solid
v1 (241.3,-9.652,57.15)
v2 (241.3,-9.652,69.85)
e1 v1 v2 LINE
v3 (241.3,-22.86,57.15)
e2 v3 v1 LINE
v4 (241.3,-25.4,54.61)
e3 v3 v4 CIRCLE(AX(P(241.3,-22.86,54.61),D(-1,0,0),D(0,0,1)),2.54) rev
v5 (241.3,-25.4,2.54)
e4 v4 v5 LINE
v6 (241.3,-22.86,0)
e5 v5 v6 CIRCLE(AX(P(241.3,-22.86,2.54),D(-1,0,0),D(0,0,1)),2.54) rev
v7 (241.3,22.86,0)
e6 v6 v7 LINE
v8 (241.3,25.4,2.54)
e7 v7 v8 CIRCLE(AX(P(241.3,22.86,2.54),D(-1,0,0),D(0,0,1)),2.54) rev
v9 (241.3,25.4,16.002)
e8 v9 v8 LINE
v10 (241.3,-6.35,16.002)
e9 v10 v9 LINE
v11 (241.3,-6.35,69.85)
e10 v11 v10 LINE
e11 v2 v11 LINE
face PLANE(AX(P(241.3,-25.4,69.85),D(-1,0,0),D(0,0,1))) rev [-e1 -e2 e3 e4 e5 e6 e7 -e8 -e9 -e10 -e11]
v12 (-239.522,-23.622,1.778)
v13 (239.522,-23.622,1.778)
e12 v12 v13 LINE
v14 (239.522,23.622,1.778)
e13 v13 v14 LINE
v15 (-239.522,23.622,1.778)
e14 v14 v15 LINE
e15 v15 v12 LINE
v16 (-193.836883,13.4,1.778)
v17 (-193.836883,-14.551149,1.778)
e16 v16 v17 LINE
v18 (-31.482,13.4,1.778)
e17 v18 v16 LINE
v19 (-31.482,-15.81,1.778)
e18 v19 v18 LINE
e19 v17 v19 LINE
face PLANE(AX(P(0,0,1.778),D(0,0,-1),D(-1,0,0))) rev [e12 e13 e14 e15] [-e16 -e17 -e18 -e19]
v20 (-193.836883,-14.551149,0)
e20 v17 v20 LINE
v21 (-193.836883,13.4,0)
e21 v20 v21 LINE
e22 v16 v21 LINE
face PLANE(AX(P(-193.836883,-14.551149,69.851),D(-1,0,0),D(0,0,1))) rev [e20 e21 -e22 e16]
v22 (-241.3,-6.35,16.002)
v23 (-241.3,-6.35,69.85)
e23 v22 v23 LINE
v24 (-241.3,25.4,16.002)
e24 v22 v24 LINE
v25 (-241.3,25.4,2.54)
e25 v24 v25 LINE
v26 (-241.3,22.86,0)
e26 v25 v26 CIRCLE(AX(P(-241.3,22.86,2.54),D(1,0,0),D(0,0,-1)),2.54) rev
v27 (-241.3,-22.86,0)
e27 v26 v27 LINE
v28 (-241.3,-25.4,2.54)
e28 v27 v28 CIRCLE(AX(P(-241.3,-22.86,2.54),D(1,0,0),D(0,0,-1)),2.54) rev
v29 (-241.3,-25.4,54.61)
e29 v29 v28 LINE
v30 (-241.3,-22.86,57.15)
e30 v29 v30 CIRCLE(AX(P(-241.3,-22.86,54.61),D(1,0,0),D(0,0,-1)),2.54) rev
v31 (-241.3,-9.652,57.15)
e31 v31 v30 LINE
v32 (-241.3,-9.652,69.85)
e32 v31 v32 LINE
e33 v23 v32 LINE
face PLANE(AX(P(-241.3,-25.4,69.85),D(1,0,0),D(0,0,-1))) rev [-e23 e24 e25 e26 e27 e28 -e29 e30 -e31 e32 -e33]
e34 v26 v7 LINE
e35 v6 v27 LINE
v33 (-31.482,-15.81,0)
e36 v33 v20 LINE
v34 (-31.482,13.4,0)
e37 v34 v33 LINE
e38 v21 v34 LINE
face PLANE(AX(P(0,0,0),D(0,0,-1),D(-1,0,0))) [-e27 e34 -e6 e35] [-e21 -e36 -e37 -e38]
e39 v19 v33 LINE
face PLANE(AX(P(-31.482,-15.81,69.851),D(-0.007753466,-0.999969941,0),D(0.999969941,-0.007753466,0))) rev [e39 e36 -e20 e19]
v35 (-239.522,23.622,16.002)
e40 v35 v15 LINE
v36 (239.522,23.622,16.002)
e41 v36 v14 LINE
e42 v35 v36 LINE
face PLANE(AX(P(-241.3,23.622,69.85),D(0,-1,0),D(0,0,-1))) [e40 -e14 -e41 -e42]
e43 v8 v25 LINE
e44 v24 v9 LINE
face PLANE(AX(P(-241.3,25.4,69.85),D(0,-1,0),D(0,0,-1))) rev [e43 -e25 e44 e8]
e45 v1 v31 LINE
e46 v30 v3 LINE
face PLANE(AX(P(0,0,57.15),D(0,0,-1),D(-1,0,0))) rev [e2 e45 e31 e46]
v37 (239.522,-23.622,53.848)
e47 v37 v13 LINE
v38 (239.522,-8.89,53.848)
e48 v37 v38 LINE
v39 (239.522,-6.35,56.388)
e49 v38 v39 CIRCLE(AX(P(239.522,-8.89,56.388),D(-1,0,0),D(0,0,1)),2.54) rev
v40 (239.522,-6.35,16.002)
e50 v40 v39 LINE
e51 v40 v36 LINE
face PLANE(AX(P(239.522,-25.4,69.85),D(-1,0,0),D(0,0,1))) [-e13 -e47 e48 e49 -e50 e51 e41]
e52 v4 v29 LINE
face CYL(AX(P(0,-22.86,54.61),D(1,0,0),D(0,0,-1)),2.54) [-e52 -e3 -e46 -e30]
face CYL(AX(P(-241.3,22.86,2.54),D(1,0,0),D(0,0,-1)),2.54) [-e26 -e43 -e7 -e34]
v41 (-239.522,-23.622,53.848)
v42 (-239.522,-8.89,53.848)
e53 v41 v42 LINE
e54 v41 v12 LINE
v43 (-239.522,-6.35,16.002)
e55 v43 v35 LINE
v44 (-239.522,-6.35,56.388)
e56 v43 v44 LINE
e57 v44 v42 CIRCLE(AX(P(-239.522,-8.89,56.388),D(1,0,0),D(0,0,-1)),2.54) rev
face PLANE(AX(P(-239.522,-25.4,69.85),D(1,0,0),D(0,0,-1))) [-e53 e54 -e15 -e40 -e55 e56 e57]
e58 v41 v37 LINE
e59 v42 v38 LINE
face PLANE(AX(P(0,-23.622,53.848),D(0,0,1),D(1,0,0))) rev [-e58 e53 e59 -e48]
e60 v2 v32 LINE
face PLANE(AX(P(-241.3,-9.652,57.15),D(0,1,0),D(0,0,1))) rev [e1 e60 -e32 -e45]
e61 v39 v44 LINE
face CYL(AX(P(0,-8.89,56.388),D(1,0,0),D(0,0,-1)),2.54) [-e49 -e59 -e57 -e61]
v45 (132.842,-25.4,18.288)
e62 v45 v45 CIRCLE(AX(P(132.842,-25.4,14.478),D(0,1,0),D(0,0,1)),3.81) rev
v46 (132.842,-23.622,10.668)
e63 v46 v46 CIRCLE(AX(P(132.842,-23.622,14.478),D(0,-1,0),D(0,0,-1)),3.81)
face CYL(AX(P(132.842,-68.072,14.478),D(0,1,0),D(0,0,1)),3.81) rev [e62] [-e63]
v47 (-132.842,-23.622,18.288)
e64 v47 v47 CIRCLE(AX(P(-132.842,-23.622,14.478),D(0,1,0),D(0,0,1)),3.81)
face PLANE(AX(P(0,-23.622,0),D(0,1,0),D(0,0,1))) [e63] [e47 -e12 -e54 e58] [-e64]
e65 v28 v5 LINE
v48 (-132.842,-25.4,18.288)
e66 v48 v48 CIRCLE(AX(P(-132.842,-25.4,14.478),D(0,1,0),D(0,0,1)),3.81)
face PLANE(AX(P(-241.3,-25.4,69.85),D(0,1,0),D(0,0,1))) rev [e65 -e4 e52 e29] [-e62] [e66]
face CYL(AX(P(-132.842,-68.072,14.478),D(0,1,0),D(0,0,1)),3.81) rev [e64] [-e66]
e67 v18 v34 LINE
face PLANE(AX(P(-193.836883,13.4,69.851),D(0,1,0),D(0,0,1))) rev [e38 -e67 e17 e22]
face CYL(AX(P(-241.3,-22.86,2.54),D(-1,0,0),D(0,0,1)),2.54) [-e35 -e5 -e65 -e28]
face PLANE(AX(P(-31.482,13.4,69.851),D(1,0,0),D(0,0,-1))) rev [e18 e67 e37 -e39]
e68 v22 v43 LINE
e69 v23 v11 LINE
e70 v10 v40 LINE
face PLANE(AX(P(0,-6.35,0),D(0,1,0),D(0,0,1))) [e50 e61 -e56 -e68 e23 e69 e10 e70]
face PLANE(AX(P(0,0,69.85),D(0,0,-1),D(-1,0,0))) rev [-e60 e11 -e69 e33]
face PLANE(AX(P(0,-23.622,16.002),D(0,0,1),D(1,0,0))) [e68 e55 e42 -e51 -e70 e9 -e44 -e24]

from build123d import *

# Parameters (mm, degrees)
SKETCH1_W           = 482.6
SKETCH1_H           = 50.8
BOSS_EXTRUDE1_DEPTH = 69.85
CUT_EXTRUDE2_DEPTH  = 49.022
SKETCH3_W           = 482.6
SKETCH3_H           = 16.002
CUT_EXTRUDE3_DEPTH  = 31.75
SKETCH4_W           = 482.6
SKETCH4_H           = 15.748
CUT_EXTRUDE4_DEPTH  = 12.7
SHELL2_START        = -23.622
SHELL2_OUTLINE_W    = 479.044
SHELL2_OUTLINE_H    = 14.224
SHELL2_DEPTH        = 47.244
SKETCH5_W           = 1.778
SKETCH5_H           = 17.272
BOSS_EXTRUDE2_DEPTH = 44.45
FILLET1_R           = 2.54
SKETCH6_R           = 3.81
CUT_EXTRUDE5_DEPTH  = 44.45
CUT_EXTRUDE6_REACH  = 254.487


# Read off the part's stored shape, not the designer's step: Shell2
with BuildPart() as part:
    # Sketch1 → Boss-Extrude1 (new body)
    with BuildSketch(Plane.XY):
        Rectangle(SKETCH1_W, SKETCH1_H)
    extrude(amount=BOSS_EXTRUDE1_DEPTH)

    # Sketch2 → Cut-Extrude2 (cut)
    with BuildSketch(Plane(origin=(0, 25.4, 0), x_dir=(1, 0, 0), z_dir=(0, 1, 0))):
        Polygon((241.3, -16.002), (-241.3, -16.002), (-241.3, -34.925), (-241.3, -53.848), (241.3, -53.848), align=None)
    extrude(amount=-CUT_EXTRUDE2_DEPTH, mode=Mode.SUBTRACT)

    # Sketch3 → Cut-Extrude3 (cut)
    with BuildSketch(Plane(origin=(0, 25.4, 0), x_dir=(1, 0, 0), z_dir=(0, 1, 0))):
        with Locations((0, -61.849)):
            Rectangle(SKETCH3_W, SKETCH3_H)
    extrude(amount=-CUT_EXTRUDE3_DEPTH, mode=Mode.SUBTRACT)

    # Sketch4 → Cut-Extrude4 (cut)
    with BuildSketch(Plane.XY.offset(69.85)):
        with Locations((0, -17.526)):
            Rectangle(SKETCH4_W, SKETCH4_H)
    extrude(amount=-CUT_EXTRUDE4_DEPTH, mode=Mode.SUBTRACT)

    # Shell2 outline → Shell2 (cut)
    with BuildSketch(Plane(origin=(0, 0, 0), x_dir=(1, 0, 0), z_dir=(0, 1, 0)).offset(SHELL2_START)):
        with Locations((0, -8.89)):
            Rectangle(SHELL2_OUTLINE_W, SHELL2_OUTLINE_H)
    extrude(amount=SHELL2_DEPTH, mode=Mode.SUBTRACT)

    # Sketch5 → Boss-Extrude2 (add)
    with BuildSketch(Plane(origin=(0, 0, 53.848), x_dir=(-1, 0, 0), z_dir=(0, 0, -1))):
        with Locations((240.411, -14.986)):
            Rectangle(SKETCH5_W, SKETCH5_H)
        with Locations((-240.411, -14.986)):
            Rectangle(SKETCH5_W, SKETCH5_H)
    extrude(amount=BOSS_EXTRUDE2_DEPTH)

    # Fillet1
    fillet1_edges = [part.edges().sort_by_distance(p)[0] for p in [
        (0, -25.4, 0),
        (0, -25.4, 57.15),
        (0, 25.4, 0),
        (0, -6.35, 53.848),
    ]]
    fillet(fillet1_edges, radius=FILLET1_R)

    # Sketch6 → Cut-Extrude5 (cut)
    with BuildSketch(Plane(origin=(0, -23.622, 0), x_dir=(1, 0, 0), z_dir=(0, 1, 0))):
        with Locations(Location((-132.842, -14.478, 0), (0, 0, 270))):
            Circle(SKETCH6_R)
        with Locations(Location((132.842, -14.478, 0), (0, 0, 270))):
            Circle(SKETCH6_R)
    extrude(amount=-CUT_EXTRUDE5_DEPTH, mode=Mode.SUBTRACT)

    # Sketch8 → Cut-Extrude6 (cut, up to next)
    with BuildSketch(Plane(origin=(0, 0, 0), x_dir=(-1, 0, 0), z_dir=(0, 0, -1)), mode=Mode.PRIVATE) as cut_extrude6_sk1:
        Polygon((31.482, 13.4), (31.482, -15.81), (193.836883288, -14.551149116), (193.836883288, 13.4), align=None)
    cut_extrude6_tool1 = extrude(cut_extrude6_sk1.sketch, amount=-CUT_EXTRUDE6_REACH, mode=Mode.PRIVATE) & part.part
    add(cut_extrude6_tool1.solids().sort_by_distance((-112.063522, -0.892598, 0))[0], mode=Mode.SUBTRACT)


solid = part.part
